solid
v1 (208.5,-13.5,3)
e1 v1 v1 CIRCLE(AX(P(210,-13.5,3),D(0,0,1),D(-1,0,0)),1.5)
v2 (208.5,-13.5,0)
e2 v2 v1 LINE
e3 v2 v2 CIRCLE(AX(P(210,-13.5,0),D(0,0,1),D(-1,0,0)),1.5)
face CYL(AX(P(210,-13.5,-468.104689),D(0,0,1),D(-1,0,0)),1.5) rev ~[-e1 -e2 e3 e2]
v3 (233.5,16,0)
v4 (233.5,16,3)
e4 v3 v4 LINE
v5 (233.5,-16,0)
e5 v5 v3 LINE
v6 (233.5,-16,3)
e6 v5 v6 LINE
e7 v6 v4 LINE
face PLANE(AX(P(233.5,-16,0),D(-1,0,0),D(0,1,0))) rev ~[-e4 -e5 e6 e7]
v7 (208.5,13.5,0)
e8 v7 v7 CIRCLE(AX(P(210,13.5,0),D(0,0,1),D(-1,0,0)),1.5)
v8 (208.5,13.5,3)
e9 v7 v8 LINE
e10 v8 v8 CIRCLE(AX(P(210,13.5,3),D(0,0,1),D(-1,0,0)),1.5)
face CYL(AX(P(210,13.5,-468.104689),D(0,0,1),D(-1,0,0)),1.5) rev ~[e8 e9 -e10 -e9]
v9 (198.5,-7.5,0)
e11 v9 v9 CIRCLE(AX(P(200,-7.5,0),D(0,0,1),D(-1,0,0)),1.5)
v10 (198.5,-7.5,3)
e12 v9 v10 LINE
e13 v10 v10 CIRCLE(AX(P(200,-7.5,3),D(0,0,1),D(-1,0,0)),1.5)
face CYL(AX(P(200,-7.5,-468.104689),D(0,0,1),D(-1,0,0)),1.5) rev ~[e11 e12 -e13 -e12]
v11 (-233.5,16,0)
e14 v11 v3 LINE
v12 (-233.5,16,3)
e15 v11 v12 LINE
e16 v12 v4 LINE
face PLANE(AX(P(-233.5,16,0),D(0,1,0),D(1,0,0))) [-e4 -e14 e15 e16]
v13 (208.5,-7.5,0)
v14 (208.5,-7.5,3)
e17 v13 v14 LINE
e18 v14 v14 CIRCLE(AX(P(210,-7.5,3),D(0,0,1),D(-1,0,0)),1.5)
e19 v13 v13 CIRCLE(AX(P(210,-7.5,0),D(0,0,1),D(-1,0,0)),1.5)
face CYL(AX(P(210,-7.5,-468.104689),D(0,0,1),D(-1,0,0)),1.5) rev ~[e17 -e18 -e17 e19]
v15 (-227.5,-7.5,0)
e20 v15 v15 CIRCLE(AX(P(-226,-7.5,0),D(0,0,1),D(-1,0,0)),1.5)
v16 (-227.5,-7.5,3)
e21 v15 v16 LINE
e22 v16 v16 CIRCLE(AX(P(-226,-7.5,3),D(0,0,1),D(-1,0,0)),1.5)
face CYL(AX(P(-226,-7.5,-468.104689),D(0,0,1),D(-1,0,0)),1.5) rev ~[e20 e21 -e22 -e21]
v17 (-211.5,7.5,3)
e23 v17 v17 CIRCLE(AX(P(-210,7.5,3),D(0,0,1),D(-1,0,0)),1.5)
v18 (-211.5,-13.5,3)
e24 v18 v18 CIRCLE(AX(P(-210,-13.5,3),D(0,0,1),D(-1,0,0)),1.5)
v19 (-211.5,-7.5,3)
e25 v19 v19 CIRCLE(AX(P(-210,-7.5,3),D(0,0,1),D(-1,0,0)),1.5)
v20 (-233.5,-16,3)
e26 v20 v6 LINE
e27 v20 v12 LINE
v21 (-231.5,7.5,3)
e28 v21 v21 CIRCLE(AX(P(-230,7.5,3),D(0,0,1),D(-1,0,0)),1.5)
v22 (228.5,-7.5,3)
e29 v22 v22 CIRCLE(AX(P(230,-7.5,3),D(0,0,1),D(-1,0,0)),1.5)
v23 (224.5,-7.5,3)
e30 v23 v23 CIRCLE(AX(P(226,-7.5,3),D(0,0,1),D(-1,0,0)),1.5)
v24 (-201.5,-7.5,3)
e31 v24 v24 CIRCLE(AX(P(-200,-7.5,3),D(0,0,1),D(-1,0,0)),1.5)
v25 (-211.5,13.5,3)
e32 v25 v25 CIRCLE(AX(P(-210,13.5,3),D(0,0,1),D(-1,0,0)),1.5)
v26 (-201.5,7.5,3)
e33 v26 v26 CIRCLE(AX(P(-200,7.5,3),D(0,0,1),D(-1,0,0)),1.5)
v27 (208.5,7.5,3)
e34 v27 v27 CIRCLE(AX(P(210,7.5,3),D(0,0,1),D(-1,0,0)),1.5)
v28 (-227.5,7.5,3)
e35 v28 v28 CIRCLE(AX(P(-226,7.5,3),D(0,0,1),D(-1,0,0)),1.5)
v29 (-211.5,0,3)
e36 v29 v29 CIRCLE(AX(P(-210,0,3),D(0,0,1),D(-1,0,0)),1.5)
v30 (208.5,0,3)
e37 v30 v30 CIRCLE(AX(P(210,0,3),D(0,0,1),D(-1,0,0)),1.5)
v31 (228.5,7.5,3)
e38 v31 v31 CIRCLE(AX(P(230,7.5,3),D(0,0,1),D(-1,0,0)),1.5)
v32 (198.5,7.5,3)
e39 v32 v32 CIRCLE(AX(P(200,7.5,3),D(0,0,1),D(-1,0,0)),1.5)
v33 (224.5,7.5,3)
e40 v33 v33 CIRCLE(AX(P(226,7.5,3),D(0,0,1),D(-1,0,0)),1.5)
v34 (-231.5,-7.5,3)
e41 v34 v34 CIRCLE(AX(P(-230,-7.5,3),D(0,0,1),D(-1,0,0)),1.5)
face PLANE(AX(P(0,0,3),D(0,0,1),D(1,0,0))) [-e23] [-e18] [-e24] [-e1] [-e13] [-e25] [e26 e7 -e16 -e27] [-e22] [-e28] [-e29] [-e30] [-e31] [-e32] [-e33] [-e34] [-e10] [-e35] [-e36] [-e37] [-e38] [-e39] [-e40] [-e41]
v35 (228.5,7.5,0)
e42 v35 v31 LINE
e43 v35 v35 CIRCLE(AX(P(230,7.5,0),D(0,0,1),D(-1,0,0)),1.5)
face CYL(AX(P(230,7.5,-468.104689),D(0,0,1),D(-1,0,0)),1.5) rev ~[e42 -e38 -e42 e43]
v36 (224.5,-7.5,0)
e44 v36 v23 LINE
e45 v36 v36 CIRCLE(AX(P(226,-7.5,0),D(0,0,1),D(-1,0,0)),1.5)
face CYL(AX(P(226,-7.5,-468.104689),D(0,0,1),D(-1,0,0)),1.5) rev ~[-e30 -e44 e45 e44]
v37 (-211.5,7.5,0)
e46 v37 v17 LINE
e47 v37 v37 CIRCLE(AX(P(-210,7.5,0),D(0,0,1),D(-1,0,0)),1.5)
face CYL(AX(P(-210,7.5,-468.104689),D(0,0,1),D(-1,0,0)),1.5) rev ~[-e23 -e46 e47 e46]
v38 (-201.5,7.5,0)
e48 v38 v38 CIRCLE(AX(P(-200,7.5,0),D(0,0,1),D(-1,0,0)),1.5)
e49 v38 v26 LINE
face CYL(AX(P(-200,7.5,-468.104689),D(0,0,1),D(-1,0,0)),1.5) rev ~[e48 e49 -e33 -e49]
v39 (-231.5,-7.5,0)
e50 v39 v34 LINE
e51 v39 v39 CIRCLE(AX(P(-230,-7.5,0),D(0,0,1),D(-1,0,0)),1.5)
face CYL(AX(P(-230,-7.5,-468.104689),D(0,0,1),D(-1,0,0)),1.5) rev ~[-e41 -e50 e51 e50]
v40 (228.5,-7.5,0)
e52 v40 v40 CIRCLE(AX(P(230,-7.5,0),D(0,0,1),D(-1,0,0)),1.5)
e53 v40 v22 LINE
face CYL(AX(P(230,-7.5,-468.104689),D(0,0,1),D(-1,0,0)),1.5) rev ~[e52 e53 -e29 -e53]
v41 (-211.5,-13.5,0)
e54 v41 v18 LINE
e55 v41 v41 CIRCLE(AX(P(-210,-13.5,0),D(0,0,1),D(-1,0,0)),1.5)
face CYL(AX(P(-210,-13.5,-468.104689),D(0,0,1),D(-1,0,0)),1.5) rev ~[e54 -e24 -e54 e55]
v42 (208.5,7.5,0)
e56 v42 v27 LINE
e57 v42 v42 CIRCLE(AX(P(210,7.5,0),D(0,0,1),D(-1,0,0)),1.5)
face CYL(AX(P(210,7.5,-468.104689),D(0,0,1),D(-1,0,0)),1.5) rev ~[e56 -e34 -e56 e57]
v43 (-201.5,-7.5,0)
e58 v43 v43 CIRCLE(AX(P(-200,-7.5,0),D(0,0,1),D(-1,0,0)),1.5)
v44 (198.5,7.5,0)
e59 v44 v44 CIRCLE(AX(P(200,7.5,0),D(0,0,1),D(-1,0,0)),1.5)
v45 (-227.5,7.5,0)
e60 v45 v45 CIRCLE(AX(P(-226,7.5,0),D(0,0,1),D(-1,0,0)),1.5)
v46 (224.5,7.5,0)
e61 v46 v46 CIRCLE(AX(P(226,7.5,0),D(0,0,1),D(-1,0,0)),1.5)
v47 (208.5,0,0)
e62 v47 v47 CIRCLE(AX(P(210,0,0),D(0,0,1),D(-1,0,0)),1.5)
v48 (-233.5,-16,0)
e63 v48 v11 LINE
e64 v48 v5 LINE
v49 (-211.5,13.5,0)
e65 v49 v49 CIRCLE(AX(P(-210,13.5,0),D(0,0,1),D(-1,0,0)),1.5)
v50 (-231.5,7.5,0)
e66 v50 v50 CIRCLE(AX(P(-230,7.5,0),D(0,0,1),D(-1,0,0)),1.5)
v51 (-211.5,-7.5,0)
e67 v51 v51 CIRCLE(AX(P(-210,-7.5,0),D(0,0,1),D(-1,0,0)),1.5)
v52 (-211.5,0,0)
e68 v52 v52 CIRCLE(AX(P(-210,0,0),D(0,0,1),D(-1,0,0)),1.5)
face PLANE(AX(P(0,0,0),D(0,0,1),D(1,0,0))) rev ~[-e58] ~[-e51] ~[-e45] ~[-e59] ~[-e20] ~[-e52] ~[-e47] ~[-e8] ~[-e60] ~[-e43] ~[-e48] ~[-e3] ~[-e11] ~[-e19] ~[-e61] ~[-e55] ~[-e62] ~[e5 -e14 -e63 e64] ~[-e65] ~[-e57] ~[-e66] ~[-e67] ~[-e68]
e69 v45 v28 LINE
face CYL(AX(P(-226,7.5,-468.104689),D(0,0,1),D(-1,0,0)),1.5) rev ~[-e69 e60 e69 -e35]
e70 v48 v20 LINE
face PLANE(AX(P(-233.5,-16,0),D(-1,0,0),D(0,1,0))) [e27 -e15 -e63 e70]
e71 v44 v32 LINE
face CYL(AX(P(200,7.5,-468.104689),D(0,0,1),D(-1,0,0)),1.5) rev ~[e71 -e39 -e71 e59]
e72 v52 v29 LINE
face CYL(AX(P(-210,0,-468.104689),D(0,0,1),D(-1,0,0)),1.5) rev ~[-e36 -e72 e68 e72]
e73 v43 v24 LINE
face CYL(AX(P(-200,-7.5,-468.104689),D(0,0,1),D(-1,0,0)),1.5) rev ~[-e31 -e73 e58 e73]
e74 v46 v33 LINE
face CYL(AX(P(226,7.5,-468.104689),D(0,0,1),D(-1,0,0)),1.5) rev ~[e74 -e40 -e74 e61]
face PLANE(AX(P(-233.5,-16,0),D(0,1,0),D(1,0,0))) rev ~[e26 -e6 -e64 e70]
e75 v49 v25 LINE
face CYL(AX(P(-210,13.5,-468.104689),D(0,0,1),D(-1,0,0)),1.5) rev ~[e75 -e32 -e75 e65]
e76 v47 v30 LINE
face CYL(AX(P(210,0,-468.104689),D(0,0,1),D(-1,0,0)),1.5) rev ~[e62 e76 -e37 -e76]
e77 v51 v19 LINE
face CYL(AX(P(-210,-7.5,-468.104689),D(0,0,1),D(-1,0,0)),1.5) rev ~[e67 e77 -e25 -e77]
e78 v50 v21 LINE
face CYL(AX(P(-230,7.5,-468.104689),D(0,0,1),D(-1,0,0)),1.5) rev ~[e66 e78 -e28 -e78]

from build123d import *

# Parameters (mm, degrees)
F0_W     = 467
F0_H     = 32
F0_W_2   = 400
F0_H_2   = 15
F0_W_3   = 16
F0_W_4   = 10
F0_W_5   = 4
F1_DEPTH = 3
F2_D     = 3


# Not quite as in the source:
# - a feature names something its author has since deleted; it is built from what else it names


with BuildPart() as f1:
    # F0 (on Top) → F1 (new body)
    with BuildSketch(Plane.XY):
        Rectangle(F0_W, F0_H)
        Polygon((226, -7.5), (210, -7.5), (200, -7.5), (-200, -7.5), (-210, -7.5), (-226, -7.5), (-230, -7.5), (-230, 7.5), (-226, 7.5), (-210, 7.5), (-200, 7.5), (200, 7.5), (210, 7.5), (226, 7.5), (230, 7.5), (230, -7.5), align=None, mode=Mode.SUBTRACT)
        Rectangle(F0_W_2, F0_H_2)
        with Locations((218, 0)):
            Rectangle(F0_W_3, F0_H_2)
        with Locations((-218, 0)):
            Rectangle(F0_W_3, F0_H_2)
        with Locations((205, 0)):
            Rectangle(F0_W_4, F0_H_2)
        with Locations((-205, 0)):
            Rectangle(F0_W_4, F0_H_2)
        with Locations((-228, 0)):
            Rectangle(F0_W_5, F0_H_2)
        with Locations((228, 0)):
            Rectangle(F0_W_5, F0_H_2)
    extrude(amount=F1_DEPTH)

    # F2 (through all)
    with Locations(Plane(origin=(0, 0, 0), x_dir=(1, 0, 0), z_dir=(0, 0, -1))):
        with Locations((210, 7.5), (210, -7.5), (230, -7.5), (230, 7.5), (-210, 7.5), (-210, -7.5), (-230, -7.5), (-230, 7.5), (210, 13.5), (-210, 13.5), (-210, -13.5), (210, -13.5), (226, 7.5), (226, -7.5), (-226, 7.5), (-226, -7.5), (200, 7.5), (200, -7.5), (-200, -7.5), (-200, 7.5), (-210, 0), (210, 0)):
            Hole(F2_D / 2)


solid = f1.part
